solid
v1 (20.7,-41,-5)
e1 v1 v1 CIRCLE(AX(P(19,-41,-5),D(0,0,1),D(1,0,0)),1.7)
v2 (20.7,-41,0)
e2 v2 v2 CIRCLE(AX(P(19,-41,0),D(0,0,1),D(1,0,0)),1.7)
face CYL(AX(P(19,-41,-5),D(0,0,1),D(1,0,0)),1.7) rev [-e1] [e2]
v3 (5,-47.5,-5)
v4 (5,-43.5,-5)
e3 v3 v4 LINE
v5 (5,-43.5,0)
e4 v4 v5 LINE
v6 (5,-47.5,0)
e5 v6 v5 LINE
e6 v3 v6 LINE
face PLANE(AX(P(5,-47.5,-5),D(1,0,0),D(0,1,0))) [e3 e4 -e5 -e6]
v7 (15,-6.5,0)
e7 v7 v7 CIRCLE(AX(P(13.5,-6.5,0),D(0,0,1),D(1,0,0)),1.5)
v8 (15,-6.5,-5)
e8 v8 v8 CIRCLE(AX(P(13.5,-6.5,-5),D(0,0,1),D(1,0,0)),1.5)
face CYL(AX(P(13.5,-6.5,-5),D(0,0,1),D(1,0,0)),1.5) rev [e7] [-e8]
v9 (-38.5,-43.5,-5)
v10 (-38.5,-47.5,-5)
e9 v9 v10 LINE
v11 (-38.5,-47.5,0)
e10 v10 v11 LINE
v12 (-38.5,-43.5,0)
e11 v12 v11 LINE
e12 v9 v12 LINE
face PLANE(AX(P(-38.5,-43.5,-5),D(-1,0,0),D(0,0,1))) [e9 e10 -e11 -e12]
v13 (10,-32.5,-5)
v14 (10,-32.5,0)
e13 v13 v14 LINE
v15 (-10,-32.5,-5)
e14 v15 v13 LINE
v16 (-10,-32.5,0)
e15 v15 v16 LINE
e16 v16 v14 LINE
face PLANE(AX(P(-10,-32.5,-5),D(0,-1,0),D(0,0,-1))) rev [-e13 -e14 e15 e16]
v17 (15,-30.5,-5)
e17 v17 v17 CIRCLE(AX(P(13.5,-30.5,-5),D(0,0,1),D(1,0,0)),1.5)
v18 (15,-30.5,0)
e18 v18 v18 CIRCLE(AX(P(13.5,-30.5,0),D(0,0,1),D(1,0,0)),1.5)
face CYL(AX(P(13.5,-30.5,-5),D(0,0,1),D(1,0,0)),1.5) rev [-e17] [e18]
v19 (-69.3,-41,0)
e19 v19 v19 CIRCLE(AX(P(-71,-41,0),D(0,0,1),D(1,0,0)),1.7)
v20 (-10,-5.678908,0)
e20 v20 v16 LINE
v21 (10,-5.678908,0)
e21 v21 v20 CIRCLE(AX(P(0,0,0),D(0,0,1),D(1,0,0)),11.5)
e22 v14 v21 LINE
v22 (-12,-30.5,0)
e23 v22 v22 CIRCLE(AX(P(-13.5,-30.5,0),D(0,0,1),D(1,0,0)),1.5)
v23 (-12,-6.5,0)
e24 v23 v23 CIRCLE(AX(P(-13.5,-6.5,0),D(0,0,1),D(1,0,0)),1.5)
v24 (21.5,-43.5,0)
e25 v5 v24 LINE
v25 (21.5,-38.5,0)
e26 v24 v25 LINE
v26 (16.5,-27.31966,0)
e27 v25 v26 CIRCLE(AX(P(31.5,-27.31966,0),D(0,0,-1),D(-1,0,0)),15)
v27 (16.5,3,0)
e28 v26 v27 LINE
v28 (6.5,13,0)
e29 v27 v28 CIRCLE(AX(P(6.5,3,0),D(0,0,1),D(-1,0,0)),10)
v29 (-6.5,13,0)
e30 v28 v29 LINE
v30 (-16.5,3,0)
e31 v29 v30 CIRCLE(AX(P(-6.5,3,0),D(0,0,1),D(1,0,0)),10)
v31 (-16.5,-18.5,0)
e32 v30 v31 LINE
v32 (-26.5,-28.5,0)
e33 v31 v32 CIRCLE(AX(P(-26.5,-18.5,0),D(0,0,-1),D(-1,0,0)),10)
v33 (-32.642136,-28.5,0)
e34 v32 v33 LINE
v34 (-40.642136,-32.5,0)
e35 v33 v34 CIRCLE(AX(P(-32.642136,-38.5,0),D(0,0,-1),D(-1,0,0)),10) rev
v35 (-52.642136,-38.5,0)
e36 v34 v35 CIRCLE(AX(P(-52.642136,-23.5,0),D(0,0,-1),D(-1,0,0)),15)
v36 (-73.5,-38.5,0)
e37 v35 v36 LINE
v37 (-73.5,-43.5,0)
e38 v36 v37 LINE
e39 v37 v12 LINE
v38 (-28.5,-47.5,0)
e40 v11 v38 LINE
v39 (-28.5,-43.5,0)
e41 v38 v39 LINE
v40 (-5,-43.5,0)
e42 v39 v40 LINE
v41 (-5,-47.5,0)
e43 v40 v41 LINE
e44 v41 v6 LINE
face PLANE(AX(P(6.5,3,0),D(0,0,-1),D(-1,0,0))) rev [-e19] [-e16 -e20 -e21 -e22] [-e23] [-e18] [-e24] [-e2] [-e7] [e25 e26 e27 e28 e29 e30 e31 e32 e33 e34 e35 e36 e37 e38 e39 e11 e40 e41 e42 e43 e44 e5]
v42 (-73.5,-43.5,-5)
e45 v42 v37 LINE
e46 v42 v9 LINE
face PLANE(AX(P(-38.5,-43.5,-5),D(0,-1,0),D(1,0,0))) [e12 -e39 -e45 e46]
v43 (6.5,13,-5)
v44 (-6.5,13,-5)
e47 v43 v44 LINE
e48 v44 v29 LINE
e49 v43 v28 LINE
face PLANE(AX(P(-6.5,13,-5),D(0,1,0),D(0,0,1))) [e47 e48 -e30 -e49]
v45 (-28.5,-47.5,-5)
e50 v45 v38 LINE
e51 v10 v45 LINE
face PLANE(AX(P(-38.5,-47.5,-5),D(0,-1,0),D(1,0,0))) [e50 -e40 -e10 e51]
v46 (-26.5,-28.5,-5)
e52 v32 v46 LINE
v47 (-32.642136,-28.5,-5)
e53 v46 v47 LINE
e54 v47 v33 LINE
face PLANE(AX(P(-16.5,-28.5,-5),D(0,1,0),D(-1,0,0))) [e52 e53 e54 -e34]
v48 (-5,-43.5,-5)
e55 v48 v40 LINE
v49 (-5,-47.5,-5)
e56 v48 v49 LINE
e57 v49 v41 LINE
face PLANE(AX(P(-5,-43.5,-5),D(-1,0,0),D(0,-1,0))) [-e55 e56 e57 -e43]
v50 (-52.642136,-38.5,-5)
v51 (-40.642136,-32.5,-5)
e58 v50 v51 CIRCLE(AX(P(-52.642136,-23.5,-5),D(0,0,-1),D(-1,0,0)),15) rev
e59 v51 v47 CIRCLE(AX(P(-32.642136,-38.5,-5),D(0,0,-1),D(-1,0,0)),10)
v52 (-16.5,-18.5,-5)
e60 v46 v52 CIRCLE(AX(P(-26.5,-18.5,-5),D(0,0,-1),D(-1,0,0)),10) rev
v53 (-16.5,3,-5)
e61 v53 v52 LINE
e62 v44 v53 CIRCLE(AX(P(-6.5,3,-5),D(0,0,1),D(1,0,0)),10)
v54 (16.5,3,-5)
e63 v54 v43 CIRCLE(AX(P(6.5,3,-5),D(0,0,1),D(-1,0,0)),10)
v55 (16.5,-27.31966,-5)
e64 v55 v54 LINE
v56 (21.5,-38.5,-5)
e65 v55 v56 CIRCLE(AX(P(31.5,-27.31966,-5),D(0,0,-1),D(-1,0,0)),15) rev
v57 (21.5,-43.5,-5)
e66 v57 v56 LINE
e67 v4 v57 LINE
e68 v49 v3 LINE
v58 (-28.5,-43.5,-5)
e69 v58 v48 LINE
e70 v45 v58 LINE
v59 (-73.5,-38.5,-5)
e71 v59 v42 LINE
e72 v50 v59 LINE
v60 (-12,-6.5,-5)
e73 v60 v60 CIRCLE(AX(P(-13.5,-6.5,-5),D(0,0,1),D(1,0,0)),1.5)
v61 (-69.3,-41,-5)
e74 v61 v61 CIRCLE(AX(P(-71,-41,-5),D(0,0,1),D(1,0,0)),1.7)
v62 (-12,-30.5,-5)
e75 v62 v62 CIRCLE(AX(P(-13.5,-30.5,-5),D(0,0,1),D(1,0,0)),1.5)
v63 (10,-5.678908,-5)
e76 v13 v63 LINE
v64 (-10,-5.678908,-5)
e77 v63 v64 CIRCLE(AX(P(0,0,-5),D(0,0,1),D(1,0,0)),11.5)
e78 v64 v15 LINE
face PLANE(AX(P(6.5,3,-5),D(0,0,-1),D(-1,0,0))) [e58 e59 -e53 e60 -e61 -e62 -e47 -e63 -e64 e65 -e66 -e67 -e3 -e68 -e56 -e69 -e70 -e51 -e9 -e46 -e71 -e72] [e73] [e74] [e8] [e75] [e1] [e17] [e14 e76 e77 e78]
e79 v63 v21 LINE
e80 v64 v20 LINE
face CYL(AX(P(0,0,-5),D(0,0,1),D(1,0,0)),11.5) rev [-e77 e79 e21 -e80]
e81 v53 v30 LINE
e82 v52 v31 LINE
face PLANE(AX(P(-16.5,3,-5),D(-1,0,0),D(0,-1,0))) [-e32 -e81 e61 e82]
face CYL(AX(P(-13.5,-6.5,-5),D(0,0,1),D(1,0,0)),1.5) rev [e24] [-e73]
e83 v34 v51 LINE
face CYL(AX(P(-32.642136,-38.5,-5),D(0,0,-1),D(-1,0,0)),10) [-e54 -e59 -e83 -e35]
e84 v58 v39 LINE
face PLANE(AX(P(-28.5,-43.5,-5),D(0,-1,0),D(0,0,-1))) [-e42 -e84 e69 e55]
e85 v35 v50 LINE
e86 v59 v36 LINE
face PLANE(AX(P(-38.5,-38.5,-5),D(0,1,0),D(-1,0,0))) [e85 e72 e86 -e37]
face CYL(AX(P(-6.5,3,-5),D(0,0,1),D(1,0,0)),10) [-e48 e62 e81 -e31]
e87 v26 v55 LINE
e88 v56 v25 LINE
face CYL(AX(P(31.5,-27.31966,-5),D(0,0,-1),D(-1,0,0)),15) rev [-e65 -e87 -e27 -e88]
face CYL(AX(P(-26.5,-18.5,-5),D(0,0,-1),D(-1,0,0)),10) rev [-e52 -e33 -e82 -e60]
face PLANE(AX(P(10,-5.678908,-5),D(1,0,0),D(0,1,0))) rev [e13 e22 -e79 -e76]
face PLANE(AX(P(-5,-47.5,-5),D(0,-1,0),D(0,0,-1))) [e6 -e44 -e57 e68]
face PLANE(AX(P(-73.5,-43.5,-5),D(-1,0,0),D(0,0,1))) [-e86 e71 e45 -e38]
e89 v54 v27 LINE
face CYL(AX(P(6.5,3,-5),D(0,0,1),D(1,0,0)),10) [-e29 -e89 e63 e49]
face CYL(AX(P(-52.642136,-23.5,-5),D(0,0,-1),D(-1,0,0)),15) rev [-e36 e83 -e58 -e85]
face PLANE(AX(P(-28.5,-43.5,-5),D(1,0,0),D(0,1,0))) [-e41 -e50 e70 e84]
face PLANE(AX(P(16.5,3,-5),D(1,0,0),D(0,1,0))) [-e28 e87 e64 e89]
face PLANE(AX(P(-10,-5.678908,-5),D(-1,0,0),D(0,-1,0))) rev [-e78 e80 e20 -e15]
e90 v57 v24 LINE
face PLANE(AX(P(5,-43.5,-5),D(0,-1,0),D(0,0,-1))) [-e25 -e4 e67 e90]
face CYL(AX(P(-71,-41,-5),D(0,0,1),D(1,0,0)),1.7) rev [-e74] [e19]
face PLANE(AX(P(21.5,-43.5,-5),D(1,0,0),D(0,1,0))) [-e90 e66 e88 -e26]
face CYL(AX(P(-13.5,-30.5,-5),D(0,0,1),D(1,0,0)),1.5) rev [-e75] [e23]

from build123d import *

# Parameters (mm, degrees)
SKETCH2_R          = 1.5
SKETCH2_R_2        = 1.7
BASE_FLANGE1_DEPTH = 5
FILLET1_R          = 15
FILLET2_R          = 10


# Sheet-metal steps are written as plain solids
with BuildPart() as part:
    # Sketch2 → Base-Flange1 (new body)
    with BuildSketch(Plane.XY):
        with BuildLine():
            Line((-6.5, 13), (6.5, 13))
            ThreePointArc((6.5, 13), (13.571067812, 10.071067812), (16.5, 3))
            Line((16.5, 3), (16.5, -38.5))
            Line((16.5, -38.5), (21.5, -38.5))
            Line((21.5, -38.5), (21.5, -43.5))
            Line((21.5, -43.5), (16.5, -43.5))
            Line((16.5, -43.5), (5, -43.5))
            Line((5, -43.5), (5, -47.5))
            Line((5, -47.5), (-5, -47.5))
            Line((-5, -47.5), (-5, -43.5))
            Line((-5, -43.5), (-28.5, -43.5))
            Line((-28.5, -43.5), (-28.5, -47.5))
            Line((-28.5, -47.5), (-38.5, -47.5))
            Line((-38.5, -47.5), (-38.5, -43.5))
            Line((-38.5, -43.5), (-73.5, -43.5))
            Line((-73.5, -43.5), (-73.5, -38.5))
            Line((-73.5, -38.5), (-38.5, -38.5))
            Line((-38.5, -38.5), (-38.5, -28.5))
            Line((-38.5, -28.5), (-16.5, -28.5))
            Line((-16.5, -28.5), (-16.5, 3))
            ThreePointArc((-16.5, 3), (-13.571067812, 10.071067812), (-6.5, 13))
        make_face()
        with Locations((-13.5, -6.5)):
            Circle(SKETCH2_R, mode=Mode.SUBTRACT)
        with Locations((-13.5, -30.5)):
            Circle(SKETCH2_R, mode=Mode.SUBTRACT)
        with Locations((13.5, -6.5)):
            Circle(SKETCH2_R, mode=Mode.SUBTRACT)
        with Locations((13.5, -30.5)):
            Circle(SKETCH2_R, mode=Mode.SUBTRACT)
        with Locations((19, -41)):
            Circle(SKETCH2_R_2, mode=Mode.SUBTRACT)
        with Locations((-71, -41)):
            Circle(SKETCH2_R_2, mode=Mode.SUBTRACT)
        with BuildLine():
            Line((-10, -5.678908346), (-10, -32.5))
            Line((-10, -32.5), (10, -32.5))
            Line((10, -32.5), (10, -5.678908346))
            ThreePointArc((10, -5.678908346), (0, 11.5), (-10, -5.678908346))
        make_face(mode=Mode.SUBTRACT)
    extrude(amount=-BASE_FLANGE1_DEPTH)

    # Fillet1
    # the kernel refuses this fillet: 15 mm, written as the material it adds along each edge
    with BuildSketch(Plane(origin=(-38.5, -38.5, 0), x_dir=(0, 1, 0), z_dir=(0, 0, -1))) as fillet1_piece_1:
        with BuildLine():
            CenterArc((15, -14.142135624), FILLET1_R, 109.471220634, 70.528779366)
            Line((0, -14.142135624), (-0.3, -14.142135624))
            Line((-0.3, -14.142135624), (-0.3, 0))
            Line((-0.3, 0), (0, 0.3))
            ThreePointArc((0, 0.3), (5, 0.3), (9.9, 0.282842712))
            Line((9.9, 0.282842712), (10, 0))
        make_face()
    extrude(amount=5)
    with BuildSketch(Plane(origin=(16.5, -38.5, 0), x_dir=(1, 0, 0), z_dir=(0, 0, -1))) as fillet1_piece_2:
        with BuildLine():
            CenterArc((15, -11.180339887), FILLET1_R, 131.810314896, 48.189685104)
            Line((0, -11.180339887), (-0.3, -11.180339887))
            Line((-0.3, -11.180339887), (-0.3, 0))
            Line((-0.3, 0), (0, 0.3))
            ThreePointArc((0, 0.3), (2.5, 0.3), (4.8, 0.223606798))
            Line((4.8, 0.223606798), (5, 0))
        make_face()
    extrude(amount=5)

    # Fillet2
    fillet2_edges = [part.edges().sort_by_distance(p)[0] for p in [
        (-38.5, -28.5, -2.5),
        (-16.5, -28.5, -2.5),
    ]]
    fillet(fillet2_edges, radius=FILLET2_R)


solid = part.part
